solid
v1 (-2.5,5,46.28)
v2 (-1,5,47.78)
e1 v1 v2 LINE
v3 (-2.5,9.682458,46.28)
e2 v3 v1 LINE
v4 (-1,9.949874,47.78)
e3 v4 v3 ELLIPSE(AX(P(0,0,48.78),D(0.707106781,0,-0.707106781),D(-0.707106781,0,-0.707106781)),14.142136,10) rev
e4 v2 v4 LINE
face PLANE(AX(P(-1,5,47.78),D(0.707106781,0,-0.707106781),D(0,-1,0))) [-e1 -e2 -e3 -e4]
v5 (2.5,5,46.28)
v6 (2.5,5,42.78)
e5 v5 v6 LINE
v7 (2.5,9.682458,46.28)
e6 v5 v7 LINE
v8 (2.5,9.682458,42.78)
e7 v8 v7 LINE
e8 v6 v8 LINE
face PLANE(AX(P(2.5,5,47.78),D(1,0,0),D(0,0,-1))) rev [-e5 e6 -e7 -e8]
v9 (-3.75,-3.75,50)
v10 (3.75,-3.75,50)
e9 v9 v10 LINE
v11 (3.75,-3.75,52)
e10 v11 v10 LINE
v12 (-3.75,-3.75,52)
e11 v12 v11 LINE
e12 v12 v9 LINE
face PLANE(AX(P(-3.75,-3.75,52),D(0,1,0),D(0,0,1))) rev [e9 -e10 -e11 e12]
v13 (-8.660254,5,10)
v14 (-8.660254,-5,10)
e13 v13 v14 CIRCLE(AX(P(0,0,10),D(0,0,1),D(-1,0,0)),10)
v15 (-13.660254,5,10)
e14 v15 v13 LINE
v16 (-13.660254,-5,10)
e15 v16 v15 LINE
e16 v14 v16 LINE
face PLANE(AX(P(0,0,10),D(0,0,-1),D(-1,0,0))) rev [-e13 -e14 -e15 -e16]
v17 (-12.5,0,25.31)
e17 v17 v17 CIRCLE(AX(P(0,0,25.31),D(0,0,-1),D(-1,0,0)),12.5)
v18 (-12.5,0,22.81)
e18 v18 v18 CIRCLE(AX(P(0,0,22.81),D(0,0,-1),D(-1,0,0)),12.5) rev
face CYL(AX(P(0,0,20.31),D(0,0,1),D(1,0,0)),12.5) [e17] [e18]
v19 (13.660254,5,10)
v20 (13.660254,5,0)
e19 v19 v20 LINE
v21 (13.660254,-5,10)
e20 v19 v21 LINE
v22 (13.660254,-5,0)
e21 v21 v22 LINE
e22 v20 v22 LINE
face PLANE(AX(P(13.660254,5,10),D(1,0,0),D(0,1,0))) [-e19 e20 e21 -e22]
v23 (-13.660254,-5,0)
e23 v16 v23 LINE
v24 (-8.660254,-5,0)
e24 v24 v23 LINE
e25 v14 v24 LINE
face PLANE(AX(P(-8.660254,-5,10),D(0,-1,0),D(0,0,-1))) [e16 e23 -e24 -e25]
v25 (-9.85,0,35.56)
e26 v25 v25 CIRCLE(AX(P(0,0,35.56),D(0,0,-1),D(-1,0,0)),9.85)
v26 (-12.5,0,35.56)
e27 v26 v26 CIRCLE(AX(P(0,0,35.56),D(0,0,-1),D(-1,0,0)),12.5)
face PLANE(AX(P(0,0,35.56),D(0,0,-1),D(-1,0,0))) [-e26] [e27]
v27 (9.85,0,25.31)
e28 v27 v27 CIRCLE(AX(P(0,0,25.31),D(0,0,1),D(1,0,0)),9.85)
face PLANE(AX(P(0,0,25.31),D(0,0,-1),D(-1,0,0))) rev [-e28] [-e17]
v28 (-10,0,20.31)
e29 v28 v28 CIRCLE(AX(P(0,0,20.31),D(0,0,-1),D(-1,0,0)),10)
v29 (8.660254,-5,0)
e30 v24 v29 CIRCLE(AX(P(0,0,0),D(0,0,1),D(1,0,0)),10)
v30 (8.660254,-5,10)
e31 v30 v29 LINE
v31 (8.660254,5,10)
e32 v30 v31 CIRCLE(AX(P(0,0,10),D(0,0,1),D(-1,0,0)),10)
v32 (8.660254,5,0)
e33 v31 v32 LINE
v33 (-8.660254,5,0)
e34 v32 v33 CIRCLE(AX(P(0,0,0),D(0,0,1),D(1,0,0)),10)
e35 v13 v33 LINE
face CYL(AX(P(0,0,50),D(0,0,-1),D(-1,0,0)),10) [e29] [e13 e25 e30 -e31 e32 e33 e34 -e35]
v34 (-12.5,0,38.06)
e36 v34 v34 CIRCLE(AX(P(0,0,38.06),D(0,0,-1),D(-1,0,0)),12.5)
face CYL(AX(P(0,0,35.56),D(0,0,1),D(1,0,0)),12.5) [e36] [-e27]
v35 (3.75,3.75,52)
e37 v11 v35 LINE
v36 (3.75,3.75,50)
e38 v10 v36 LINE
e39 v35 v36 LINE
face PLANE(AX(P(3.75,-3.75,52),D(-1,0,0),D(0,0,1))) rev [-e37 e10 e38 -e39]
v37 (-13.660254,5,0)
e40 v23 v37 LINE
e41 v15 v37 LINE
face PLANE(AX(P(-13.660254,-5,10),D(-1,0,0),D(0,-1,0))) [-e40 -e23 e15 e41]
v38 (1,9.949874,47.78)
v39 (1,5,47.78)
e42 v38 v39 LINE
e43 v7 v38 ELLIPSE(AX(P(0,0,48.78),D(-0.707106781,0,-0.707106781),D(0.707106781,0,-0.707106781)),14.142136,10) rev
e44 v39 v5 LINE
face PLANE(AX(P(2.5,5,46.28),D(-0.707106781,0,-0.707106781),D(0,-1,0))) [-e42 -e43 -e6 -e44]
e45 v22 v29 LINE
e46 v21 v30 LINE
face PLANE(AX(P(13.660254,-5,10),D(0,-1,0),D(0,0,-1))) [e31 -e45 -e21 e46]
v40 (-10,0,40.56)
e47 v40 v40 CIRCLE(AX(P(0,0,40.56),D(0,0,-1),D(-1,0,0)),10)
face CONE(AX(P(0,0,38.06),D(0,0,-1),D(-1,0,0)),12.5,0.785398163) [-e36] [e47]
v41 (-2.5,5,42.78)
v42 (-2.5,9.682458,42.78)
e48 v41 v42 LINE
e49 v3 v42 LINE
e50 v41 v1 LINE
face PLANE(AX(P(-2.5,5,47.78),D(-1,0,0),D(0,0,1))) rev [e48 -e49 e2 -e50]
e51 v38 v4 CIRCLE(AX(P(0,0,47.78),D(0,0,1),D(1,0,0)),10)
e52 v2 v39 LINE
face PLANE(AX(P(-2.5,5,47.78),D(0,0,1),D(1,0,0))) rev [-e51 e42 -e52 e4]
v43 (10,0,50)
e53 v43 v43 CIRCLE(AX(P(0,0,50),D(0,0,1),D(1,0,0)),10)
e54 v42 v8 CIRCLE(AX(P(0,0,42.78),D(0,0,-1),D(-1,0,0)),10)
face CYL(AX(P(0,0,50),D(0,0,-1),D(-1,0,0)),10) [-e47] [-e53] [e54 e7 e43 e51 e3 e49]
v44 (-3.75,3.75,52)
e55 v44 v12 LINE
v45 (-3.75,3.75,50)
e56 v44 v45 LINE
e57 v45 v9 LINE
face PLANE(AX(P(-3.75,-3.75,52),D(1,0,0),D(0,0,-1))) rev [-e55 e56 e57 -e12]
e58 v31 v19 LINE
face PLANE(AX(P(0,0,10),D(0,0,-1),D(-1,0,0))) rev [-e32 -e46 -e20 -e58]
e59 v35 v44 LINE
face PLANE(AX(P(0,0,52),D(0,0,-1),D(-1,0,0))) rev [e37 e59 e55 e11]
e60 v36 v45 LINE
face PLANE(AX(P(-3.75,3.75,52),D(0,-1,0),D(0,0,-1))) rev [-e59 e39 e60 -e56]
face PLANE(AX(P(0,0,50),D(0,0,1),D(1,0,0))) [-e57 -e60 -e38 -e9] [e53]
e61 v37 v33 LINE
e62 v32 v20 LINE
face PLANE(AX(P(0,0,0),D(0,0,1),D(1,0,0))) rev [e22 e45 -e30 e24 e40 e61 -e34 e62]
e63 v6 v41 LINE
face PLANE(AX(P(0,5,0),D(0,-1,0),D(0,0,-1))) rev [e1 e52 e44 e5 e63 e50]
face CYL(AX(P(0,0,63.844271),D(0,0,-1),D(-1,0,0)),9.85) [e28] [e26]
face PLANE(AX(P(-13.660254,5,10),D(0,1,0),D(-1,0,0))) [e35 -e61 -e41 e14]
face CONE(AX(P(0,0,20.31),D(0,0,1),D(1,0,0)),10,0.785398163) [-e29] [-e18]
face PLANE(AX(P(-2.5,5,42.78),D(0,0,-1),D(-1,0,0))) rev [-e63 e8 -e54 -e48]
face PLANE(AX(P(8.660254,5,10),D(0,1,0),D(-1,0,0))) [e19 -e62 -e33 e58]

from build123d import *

# Parameters (mm, degrees)
SKETCH1_R           = 10
BOSS_EXTRUDE1_DEPTH = 50
BOSS_EXTRUDE2_DEPTH = 10
BOSS_EXTRUDE5_START = -25.31
SKETCH6_R           = 12.5
BOSS_EXTRUDE5_DEPTH = 5
LPATTERN1_COUNT     = 2
LPATTERN1_PITCH     = 15.25
CHAMFER2_SIZE       = 2.5
CUT_EXTRUDE1_START  = 10
SKETCH7_W           = 5
SKETCH7_H           = 5
CUT_EXTRUDE1_DEPTH  = 5
CHAMFER3_SIZE       = 1.5
SKETCH8_W           = 7.5
SKETCH8_H           = 7.5
BOSS_EXTRUDE6_DEPTH = 2
SKETCH10_R          = 10
SKETCH10_R_2        = 9.85
CUT_EXTRUDE3_DEPTH  = 10.25


with BuildPart() as part:
    # Sketch1 → Boss-Extrude1 (new body)
    with BuildSketch(Plane.XY):
        Circle(SKETCH1_R)
    extrude(amount=BOSS_EXTRUDE1_DEPTH)

    # Sketch2 → Boss-Extrude2 (add)
    with BuildSketch(Plane(origin=(0, 0, 0), x_dir=(-1, 0, 0), z_dir=(0, 0, -1))):
        with BuildLine():
            Line((-8.660254038, 5), (-13.660254038, 5))
            Line((-13.660254038, 5), (-13.660254038, -5))
            Line((-13.660254038, -5), (-8.660254038, -5))
            ThreePointArc((-8.660254038, -5), (-10, 0), (-8.660254038, 5))
        make_face()
        with BuildLine():
            Line((8.660254038, -5), (13.660254038, -5))
            Line((13.660254038, -5), (13.660254038, 5))
            Line((13.660254038, 5), (8.660254038, 5))
            ThreePointArc((8.660254038, 5), (10, 0), (8.660254038, -5))
        make_face()
    extrude(amount=-BOSS_EXTRUDE2_DEPTH)

    # Sketch6 → Boss-Extrude5 (add)
    with BuildSketch(Plane(origin=(0, 0, 0), x_dir=(-1, 0, 0), z_dir=(0, 0, -1)).offset(BOSS_EXTRUDE5_START)):
        Circle(SKETCH6_R)
    boss_extrude5 = extrude(amount=BOSS_EXTRUDE5_DEPTH)

    # LPattern1: Boss-Extrude5 ×2
    with Locations(*[(0, 0, i * LPATTERN1_PITCH) for i in range(1, LPATTERN1_COUNT)]):
        add(boss_extrude5)

    # Chamfer2
    chamfer2_edges = [part.edges().sort_by_distance(p)[0] for p in [
        (12.5, 0, 20.31),
        (12.5, 0, 40.56),
    ]]
    chamfer(chamfer2_edges, length=CHAMFER2_SIZE - 0.0001)  # a hair under: the kernel refuses the full size

    # Sketch7 → Cut-Extrude1 (cut)
    with BuildSketch(Plane(origin=(0, 0, 0), x_dir=(1, 0, 0), z_dir=(0, 1, 0)).offset(CUT_EXTRUDE1_START)):
        with Locations((0, -45.28)):
            Rectangle(SKETCH7_W, SKETCH7_H)
    extrude(amount=-CUT_EXTRUDE1_DEPTH, mode=Mode.SUBTRACT)

    # Chamfer3
    chamfer3_edges = [part.edges().sort_by_distance(p)[0] for p in [
        (2.5, 7.341229183, 47.78),
        (-2.5, 7.341229183, 47.78),
    ]]
    chamfer(chamfer3_edges, length=CHAMFER3_SIZE)

    # Sketch8 → Boss-Extrude6 (add)
    with BuildSketch(Plane.XY.offset(50)):
        Rectangle(SKETCH8_W, SKETCH8_H)
    extrude(amount=BOSS_EXTRUDE6_DEPTH)

    # Sketch10 → Cut-Extrude3 (cut)
    with BuildSketch(Plane.XY.offset(25.31)):
        with Locations(Location((0, 0, 0), (0, 0, 180))):
            Circle(SKETCH10_R)
        with Locations(Location((0, 0, 0), (0, 0, 180))):
            Circle(SKETCH10_R_2, mode=Mode.SUBTRACT)
    extrude(amount=CUT_EXTRUDE3_DEPTH, mode=Mode.SUBTRACT)


solid = part.part
